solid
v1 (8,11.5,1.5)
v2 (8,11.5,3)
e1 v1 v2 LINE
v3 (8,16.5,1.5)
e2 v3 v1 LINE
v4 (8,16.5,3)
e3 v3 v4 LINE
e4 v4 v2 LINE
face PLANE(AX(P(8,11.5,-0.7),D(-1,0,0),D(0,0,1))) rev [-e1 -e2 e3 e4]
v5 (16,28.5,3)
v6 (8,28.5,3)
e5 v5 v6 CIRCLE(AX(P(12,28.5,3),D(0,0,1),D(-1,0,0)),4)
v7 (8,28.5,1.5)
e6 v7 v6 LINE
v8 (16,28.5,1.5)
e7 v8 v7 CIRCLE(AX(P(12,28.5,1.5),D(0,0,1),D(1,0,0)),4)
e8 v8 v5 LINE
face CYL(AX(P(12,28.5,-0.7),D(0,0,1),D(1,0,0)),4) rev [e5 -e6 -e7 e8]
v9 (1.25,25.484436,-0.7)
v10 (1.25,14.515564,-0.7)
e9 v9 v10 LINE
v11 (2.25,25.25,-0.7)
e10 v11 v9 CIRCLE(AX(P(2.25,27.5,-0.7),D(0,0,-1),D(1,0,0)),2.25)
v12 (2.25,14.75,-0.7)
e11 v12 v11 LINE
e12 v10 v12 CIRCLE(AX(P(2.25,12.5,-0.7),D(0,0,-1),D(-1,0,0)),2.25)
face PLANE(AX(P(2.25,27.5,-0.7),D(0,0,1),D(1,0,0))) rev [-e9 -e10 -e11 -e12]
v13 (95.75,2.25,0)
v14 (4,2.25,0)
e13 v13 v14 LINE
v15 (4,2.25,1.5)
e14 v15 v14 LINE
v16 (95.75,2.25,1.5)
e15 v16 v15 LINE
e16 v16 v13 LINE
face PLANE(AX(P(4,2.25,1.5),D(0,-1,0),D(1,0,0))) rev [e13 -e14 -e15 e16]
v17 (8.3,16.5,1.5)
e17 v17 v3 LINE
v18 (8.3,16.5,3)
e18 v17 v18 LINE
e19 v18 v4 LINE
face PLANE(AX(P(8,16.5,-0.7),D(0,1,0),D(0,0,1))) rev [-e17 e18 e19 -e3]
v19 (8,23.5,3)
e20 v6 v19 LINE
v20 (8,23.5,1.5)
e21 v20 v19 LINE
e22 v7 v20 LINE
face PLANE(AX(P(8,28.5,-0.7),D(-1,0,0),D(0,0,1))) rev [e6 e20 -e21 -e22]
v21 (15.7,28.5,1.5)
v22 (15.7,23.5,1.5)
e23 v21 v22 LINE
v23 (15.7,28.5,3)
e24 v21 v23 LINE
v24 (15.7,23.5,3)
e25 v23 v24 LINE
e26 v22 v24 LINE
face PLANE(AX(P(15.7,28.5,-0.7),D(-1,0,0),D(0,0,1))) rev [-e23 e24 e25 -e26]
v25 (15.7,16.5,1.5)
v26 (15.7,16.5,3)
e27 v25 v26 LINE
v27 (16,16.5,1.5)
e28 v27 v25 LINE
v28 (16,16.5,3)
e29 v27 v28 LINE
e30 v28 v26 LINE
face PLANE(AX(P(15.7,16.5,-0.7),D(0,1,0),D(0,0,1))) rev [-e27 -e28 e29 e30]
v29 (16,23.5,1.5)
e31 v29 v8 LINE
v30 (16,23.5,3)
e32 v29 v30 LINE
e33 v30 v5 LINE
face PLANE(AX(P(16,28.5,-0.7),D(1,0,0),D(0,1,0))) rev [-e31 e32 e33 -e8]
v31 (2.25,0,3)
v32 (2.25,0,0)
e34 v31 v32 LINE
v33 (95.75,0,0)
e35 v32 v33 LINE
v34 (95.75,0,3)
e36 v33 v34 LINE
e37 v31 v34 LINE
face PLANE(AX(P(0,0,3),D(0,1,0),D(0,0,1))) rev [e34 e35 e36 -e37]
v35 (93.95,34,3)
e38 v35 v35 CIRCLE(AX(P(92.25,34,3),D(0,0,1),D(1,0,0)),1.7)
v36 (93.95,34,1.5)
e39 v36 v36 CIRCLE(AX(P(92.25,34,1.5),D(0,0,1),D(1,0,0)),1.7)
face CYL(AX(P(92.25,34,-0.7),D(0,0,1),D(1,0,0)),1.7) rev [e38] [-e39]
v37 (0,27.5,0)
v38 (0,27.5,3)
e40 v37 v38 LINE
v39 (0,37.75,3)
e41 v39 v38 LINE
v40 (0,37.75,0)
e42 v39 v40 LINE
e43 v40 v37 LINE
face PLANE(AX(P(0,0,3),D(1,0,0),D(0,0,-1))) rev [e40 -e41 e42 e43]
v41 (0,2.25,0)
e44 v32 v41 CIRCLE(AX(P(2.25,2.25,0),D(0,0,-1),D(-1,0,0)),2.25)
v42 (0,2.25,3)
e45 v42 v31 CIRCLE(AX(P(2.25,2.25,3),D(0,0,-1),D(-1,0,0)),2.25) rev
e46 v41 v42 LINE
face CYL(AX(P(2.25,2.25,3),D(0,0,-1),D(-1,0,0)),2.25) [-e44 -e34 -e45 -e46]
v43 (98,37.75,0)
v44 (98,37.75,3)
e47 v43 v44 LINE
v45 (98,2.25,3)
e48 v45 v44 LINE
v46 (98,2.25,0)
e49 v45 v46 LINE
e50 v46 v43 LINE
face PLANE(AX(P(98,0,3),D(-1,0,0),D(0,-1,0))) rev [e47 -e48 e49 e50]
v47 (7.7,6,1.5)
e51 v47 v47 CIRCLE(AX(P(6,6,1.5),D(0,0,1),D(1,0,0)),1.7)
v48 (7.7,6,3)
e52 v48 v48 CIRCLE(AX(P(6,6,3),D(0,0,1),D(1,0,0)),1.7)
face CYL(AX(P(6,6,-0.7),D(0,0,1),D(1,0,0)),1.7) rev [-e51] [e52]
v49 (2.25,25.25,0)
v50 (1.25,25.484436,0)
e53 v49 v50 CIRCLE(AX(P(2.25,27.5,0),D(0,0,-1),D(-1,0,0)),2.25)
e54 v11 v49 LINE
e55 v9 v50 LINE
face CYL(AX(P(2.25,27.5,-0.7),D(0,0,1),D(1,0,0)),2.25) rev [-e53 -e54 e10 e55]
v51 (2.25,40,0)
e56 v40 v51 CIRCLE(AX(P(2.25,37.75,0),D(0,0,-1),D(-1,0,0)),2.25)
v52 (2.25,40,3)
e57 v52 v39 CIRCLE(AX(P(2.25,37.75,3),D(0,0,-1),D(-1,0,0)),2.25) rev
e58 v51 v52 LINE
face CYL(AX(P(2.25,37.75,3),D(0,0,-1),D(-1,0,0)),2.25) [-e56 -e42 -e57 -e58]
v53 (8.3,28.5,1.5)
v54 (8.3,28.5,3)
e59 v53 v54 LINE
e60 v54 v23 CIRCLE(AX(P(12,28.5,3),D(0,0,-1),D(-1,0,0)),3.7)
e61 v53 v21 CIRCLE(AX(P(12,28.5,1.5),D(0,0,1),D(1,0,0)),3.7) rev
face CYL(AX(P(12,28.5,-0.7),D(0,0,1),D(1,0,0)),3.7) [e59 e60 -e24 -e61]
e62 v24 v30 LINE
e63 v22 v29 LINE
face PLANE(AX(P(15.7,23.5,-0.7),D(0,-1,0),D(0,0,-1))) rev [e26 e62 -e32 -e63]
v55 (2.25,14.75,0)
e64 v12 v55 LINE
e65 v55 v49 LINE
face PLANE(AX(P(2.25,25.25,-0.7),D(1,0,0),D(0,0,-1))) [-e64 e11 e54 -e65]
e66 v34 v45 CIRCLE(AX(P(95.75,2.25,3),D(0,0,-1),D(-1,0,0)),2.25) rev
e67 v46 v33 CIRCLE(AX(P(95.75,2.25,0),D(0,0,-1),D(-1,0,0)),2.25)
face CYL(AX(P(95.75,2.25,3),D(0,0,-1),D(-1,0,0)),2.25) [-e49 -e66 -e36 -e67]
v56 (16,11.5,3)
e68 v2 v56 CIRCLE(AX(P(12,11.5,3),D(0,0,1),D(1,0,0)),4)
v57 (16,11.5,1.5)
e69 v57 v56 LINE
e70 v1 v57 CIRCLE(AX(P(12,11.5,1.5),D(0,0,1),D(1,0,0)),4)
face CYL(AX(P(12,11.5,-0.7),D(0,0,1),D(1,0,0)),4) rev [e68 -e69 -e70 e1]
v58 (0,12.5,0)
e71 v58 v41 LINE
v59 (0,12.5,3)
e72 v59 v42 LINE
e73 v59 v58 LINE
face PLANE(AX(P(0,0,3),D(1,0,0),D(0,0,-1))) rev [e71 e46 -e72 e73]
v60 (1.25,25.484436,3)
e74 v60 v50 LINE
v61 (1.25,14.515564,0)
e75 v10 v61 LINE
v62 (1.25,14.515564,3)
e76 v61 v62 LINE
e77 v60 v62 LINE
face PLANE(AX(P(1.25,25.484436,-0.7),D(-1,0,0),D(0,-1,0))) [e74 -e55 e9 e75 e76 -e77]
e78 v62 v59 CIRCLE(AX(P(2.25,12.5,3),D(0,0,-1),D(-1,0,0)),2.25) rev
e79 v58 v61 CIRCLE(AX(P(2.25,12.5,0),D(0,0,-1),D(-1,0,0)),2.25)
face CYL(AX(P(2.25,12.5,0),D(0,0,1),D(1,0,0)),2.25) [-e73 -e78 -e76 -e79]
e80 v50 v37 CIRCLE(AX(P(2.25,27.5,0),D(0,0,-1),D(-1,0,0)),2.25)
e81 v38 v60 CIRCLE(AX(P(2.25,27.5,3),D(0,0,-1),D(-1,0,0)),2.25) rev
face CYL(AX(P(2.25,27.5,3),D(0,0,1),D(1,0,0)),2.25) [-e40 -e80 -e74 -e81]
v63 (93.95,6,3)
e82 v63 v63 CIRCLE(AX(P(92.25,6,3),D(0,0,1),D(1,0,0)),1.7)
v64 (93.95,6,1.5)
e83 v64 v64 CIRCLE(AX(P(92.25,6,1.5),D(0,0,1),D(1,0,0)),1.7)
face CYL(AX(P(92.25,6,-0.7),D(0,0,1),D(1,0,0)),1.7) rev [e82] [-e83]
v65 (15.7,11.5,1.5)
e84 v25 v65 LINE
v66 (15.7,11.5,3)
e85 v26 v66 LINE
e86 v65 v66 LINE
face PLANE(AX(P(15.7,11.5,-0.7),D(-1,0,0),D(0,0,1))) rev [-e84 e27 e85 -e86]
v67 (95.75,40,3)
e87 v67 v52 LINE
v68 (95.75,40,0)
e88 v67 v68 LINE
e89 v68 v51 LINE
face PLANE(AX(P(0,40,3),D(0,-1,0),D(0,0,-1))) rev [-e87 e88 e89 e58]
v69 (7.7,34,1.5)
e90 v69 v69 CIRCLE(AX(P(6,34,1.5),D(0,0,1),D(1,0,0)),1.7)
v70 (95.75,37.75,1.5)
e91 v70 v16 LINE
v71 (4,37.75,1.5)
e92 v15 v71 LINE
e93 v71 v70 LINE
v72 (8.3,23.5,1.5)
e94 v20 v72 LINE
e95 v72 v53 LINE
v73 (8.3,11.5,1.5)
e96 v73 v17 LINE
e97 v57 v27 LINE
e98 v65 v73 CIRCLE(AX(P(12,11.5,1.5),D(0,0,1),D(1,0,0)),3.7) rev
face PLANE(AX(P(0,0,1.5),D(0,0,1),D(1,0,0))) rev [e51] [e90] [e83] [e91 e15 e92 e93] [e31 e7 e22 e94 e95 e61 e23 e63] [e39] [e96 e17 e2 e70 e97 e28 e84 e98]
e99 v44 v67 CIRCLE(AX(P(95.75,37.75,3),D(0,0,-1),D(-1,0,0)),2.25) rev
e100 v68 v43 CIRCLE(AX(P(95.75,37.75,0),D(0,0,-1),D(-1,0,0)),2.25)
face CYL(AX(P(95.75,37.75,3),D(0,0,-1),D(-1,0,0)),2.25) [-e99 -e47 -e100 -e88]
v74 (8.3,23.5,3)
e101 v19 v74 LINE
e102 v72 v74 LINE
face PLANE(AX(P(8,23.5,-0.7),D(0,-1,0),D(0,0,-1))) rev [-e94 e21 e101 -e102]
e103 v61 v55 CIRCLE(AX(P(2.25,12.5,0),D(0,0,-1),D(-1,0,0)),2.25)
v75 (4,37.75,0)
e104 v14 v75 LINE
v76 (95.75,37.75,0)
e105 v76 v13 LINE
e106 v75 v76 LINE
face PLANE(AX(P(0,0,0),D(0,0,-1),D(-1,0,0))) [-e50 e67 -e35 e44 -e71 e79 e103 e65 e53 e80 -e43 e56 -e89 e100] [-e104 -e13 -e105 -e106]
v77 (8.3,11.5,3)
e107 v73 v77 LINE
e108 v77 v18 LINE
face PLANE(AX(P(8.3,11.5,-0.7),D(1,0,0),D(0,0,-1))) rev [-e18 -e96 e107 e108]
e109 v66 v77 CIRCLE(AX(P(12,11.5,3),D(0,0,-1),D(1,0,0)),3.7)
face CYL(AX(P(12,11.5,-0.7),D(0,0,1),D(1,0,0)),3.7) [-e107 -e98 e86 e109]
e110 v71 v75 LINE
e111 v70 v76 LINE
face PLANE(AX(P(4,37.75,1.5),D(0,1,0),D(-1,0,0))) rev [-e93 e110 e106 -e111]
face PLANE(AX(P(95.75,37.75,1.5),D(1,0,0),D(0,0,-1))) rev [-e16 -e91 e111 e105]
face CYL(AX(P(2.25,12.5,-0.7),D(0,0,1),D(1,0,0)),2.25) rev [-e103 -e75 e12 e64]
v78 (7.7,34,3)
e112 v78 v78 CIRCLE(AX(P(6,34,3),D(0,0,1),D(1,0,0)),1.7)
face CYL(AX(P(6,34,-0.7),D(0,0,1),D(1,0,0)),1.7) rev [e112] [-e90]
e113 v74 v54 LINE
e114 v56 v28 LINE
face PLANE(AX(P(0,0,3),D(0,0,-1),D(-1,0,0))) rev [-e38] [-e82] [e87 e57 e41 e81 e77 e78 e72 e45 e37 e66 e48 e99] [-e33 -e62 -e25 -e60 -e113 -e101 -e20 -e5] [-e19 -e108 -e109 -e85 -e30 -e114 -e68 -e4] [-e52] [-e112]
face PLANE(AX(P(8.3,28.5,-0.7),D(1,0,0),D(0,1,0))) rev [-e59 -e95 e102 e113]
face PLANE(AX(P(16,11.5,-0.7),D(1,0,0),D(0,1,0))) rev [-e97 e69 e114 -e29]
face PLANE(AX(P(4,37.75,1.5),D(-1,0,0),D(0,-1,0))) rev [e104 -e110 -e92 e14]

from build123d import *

# Parameters (mm, degrees)
SKETCH1_W           = 98
SKETCH1_H           = 40
BODY_DEPTH          = 3
SKETCH2_W           = 2.25
SKETCH2_H           = 10.5
CUT_EXTRUDE1_DEPTH  = 106.891453857
FILLET2_R           = 2.25
FILLET1_R           = 2.25
BOSS_EXTRUDE4_DEPTH = 3.7
SKETCH7_W           = 91.75
SKETCH7_H           = 35.5
OLED_RECESS_DEPTH   = 1.5
SKETCH9_R           = 1.7
CUT_EXTRUDE5_DEPTH  = 106.913596861


with BuildPart() as part:
    # Sketch1 → body (new body)
    with BuildSketch(Plane.XY):
        with Locations((49, 20)):
            Rectangle(SKETCH1_W, SKETCH1_H)
    extrude(amount=BODY_DEPTH)

    # Sketch2 → Cut-Extrude1 (cut, through all)
    with BuildSketch(Plane.XY.offset(3)):
        with Locations((1.125, 20)):
            Rectangle(SKETCH2_W, SKETCH2_H)
    extrude(amount=-CUT_EXTRUDE1_DEPTH, mode=Mode.SUBTRACT)

    # Fillet2
    fillet2_edges = [part.edges().sort_by_distance(p)[0] for p in [
        (0, 14.75, 1.5),
        (0, 25.25, 1.5),
    ]]
    fillet(fillet2_edges, radius=FILLET2_R - 0.0001)  # a hair under: the kernel refuses the full size

    # Fillet1
    fillet1_edges = [part.edges().sort_by_distance(p)[0] for p in [
        (0, 40, 1.5),
        (98, 40, 1.5),
        (98, 0, 1.5),
        (0, 0, 1.5),
    ]]
    fillet(fillet1_edges, radius=FILLET1_R)

    # Sketch6 → Boss-Extrude4 (add)
    with BuildSketch(Plane.XY.offset(3)):
        with BuildLine():
            Line((1.25, 25.484435563), (1.25, 14.515564437))
            ThreePointArc((1.25, 14.515564437), (1.736443763, 14.69060722), (2.25, 14.75))
            Line((2.25, 14.75), (2.25, 25.25))
            ThreePointArc((2.25, 25.25), (1.736443763, 25.30939278), (1.25, 25.484435563))
        make_face()
    extrude(amount=-BOSS_EXTRUDE4_DEPTH)

    # Sketch7 → oled-recess (cut)
    with BuildSketch(Plane(origin=(0, 0, 0), x_dir=(-1, 0, 0), z_dir=(0, 0, -1))):
        with Locations((-49.875, 20)):
            Rectangle(SKETCH7_W, SKETCH7_H)
    extrude(amount=-OLED_RECESS_DEPTH, mode=Mode.SUBTRACT)

    # Sketch9 → Cut-Extrude5 (cut, through all)
    with BuildSketch(Plane.XY.offset(3)):
        with Locations((6, 34)):
            Circle(SKETCH9_R)
        with Locations((92.25, 34)):
            Circle(SKETCH9_R)
        with Locations((6, 6)):
            Circle(SKETCH9_R)
        with Locations((92.25, 6)):
            Circle(SKETCH9_R)
        with BuildLine():
            Line((8, 28.5), (8, 23.5))
            Line((8, 23.5), (8.3, 23.5))
            Line((8.3, 23.5), (8.3, 28.5))
            ThreePointArc((8.3, 28.5), (12, 32.2), (15.7, 28.5))
            Line((15.7, 28.5), (15.7, 23.5))
            Line((15.7, 23.5), (16, 23.5))
            Line((16, 23.5), (16, 28.5))
            ThreePointArc((16, 28.5), (12, 32.5), (8, 28.5))
        make_face()
        with BuildLine():
            Line((15.7, 16.5), (16, 16.5))
            Line((16, 16.5), (16, 11.5))
            ThreePointArc((16, 11.5), (12, 7.5), (8, 11.5))
            Line((8, 11.5), (8, 16.5))
            Line((8, 16.5), (8.3, 16.5))
            Line((8.3, 16.5), (8.3, 11.5))
            ThreePointArc((8.3, 11.5), (12, 7.8), (15.7, 11.5))
            Line((15.7, 11.5), (15.7, 16.5))
        make_face()
    extrude(amount=-CUT_EXTRUDE5_DEPTH, mode=Mode.SUBTRACT)


solid = part.part
